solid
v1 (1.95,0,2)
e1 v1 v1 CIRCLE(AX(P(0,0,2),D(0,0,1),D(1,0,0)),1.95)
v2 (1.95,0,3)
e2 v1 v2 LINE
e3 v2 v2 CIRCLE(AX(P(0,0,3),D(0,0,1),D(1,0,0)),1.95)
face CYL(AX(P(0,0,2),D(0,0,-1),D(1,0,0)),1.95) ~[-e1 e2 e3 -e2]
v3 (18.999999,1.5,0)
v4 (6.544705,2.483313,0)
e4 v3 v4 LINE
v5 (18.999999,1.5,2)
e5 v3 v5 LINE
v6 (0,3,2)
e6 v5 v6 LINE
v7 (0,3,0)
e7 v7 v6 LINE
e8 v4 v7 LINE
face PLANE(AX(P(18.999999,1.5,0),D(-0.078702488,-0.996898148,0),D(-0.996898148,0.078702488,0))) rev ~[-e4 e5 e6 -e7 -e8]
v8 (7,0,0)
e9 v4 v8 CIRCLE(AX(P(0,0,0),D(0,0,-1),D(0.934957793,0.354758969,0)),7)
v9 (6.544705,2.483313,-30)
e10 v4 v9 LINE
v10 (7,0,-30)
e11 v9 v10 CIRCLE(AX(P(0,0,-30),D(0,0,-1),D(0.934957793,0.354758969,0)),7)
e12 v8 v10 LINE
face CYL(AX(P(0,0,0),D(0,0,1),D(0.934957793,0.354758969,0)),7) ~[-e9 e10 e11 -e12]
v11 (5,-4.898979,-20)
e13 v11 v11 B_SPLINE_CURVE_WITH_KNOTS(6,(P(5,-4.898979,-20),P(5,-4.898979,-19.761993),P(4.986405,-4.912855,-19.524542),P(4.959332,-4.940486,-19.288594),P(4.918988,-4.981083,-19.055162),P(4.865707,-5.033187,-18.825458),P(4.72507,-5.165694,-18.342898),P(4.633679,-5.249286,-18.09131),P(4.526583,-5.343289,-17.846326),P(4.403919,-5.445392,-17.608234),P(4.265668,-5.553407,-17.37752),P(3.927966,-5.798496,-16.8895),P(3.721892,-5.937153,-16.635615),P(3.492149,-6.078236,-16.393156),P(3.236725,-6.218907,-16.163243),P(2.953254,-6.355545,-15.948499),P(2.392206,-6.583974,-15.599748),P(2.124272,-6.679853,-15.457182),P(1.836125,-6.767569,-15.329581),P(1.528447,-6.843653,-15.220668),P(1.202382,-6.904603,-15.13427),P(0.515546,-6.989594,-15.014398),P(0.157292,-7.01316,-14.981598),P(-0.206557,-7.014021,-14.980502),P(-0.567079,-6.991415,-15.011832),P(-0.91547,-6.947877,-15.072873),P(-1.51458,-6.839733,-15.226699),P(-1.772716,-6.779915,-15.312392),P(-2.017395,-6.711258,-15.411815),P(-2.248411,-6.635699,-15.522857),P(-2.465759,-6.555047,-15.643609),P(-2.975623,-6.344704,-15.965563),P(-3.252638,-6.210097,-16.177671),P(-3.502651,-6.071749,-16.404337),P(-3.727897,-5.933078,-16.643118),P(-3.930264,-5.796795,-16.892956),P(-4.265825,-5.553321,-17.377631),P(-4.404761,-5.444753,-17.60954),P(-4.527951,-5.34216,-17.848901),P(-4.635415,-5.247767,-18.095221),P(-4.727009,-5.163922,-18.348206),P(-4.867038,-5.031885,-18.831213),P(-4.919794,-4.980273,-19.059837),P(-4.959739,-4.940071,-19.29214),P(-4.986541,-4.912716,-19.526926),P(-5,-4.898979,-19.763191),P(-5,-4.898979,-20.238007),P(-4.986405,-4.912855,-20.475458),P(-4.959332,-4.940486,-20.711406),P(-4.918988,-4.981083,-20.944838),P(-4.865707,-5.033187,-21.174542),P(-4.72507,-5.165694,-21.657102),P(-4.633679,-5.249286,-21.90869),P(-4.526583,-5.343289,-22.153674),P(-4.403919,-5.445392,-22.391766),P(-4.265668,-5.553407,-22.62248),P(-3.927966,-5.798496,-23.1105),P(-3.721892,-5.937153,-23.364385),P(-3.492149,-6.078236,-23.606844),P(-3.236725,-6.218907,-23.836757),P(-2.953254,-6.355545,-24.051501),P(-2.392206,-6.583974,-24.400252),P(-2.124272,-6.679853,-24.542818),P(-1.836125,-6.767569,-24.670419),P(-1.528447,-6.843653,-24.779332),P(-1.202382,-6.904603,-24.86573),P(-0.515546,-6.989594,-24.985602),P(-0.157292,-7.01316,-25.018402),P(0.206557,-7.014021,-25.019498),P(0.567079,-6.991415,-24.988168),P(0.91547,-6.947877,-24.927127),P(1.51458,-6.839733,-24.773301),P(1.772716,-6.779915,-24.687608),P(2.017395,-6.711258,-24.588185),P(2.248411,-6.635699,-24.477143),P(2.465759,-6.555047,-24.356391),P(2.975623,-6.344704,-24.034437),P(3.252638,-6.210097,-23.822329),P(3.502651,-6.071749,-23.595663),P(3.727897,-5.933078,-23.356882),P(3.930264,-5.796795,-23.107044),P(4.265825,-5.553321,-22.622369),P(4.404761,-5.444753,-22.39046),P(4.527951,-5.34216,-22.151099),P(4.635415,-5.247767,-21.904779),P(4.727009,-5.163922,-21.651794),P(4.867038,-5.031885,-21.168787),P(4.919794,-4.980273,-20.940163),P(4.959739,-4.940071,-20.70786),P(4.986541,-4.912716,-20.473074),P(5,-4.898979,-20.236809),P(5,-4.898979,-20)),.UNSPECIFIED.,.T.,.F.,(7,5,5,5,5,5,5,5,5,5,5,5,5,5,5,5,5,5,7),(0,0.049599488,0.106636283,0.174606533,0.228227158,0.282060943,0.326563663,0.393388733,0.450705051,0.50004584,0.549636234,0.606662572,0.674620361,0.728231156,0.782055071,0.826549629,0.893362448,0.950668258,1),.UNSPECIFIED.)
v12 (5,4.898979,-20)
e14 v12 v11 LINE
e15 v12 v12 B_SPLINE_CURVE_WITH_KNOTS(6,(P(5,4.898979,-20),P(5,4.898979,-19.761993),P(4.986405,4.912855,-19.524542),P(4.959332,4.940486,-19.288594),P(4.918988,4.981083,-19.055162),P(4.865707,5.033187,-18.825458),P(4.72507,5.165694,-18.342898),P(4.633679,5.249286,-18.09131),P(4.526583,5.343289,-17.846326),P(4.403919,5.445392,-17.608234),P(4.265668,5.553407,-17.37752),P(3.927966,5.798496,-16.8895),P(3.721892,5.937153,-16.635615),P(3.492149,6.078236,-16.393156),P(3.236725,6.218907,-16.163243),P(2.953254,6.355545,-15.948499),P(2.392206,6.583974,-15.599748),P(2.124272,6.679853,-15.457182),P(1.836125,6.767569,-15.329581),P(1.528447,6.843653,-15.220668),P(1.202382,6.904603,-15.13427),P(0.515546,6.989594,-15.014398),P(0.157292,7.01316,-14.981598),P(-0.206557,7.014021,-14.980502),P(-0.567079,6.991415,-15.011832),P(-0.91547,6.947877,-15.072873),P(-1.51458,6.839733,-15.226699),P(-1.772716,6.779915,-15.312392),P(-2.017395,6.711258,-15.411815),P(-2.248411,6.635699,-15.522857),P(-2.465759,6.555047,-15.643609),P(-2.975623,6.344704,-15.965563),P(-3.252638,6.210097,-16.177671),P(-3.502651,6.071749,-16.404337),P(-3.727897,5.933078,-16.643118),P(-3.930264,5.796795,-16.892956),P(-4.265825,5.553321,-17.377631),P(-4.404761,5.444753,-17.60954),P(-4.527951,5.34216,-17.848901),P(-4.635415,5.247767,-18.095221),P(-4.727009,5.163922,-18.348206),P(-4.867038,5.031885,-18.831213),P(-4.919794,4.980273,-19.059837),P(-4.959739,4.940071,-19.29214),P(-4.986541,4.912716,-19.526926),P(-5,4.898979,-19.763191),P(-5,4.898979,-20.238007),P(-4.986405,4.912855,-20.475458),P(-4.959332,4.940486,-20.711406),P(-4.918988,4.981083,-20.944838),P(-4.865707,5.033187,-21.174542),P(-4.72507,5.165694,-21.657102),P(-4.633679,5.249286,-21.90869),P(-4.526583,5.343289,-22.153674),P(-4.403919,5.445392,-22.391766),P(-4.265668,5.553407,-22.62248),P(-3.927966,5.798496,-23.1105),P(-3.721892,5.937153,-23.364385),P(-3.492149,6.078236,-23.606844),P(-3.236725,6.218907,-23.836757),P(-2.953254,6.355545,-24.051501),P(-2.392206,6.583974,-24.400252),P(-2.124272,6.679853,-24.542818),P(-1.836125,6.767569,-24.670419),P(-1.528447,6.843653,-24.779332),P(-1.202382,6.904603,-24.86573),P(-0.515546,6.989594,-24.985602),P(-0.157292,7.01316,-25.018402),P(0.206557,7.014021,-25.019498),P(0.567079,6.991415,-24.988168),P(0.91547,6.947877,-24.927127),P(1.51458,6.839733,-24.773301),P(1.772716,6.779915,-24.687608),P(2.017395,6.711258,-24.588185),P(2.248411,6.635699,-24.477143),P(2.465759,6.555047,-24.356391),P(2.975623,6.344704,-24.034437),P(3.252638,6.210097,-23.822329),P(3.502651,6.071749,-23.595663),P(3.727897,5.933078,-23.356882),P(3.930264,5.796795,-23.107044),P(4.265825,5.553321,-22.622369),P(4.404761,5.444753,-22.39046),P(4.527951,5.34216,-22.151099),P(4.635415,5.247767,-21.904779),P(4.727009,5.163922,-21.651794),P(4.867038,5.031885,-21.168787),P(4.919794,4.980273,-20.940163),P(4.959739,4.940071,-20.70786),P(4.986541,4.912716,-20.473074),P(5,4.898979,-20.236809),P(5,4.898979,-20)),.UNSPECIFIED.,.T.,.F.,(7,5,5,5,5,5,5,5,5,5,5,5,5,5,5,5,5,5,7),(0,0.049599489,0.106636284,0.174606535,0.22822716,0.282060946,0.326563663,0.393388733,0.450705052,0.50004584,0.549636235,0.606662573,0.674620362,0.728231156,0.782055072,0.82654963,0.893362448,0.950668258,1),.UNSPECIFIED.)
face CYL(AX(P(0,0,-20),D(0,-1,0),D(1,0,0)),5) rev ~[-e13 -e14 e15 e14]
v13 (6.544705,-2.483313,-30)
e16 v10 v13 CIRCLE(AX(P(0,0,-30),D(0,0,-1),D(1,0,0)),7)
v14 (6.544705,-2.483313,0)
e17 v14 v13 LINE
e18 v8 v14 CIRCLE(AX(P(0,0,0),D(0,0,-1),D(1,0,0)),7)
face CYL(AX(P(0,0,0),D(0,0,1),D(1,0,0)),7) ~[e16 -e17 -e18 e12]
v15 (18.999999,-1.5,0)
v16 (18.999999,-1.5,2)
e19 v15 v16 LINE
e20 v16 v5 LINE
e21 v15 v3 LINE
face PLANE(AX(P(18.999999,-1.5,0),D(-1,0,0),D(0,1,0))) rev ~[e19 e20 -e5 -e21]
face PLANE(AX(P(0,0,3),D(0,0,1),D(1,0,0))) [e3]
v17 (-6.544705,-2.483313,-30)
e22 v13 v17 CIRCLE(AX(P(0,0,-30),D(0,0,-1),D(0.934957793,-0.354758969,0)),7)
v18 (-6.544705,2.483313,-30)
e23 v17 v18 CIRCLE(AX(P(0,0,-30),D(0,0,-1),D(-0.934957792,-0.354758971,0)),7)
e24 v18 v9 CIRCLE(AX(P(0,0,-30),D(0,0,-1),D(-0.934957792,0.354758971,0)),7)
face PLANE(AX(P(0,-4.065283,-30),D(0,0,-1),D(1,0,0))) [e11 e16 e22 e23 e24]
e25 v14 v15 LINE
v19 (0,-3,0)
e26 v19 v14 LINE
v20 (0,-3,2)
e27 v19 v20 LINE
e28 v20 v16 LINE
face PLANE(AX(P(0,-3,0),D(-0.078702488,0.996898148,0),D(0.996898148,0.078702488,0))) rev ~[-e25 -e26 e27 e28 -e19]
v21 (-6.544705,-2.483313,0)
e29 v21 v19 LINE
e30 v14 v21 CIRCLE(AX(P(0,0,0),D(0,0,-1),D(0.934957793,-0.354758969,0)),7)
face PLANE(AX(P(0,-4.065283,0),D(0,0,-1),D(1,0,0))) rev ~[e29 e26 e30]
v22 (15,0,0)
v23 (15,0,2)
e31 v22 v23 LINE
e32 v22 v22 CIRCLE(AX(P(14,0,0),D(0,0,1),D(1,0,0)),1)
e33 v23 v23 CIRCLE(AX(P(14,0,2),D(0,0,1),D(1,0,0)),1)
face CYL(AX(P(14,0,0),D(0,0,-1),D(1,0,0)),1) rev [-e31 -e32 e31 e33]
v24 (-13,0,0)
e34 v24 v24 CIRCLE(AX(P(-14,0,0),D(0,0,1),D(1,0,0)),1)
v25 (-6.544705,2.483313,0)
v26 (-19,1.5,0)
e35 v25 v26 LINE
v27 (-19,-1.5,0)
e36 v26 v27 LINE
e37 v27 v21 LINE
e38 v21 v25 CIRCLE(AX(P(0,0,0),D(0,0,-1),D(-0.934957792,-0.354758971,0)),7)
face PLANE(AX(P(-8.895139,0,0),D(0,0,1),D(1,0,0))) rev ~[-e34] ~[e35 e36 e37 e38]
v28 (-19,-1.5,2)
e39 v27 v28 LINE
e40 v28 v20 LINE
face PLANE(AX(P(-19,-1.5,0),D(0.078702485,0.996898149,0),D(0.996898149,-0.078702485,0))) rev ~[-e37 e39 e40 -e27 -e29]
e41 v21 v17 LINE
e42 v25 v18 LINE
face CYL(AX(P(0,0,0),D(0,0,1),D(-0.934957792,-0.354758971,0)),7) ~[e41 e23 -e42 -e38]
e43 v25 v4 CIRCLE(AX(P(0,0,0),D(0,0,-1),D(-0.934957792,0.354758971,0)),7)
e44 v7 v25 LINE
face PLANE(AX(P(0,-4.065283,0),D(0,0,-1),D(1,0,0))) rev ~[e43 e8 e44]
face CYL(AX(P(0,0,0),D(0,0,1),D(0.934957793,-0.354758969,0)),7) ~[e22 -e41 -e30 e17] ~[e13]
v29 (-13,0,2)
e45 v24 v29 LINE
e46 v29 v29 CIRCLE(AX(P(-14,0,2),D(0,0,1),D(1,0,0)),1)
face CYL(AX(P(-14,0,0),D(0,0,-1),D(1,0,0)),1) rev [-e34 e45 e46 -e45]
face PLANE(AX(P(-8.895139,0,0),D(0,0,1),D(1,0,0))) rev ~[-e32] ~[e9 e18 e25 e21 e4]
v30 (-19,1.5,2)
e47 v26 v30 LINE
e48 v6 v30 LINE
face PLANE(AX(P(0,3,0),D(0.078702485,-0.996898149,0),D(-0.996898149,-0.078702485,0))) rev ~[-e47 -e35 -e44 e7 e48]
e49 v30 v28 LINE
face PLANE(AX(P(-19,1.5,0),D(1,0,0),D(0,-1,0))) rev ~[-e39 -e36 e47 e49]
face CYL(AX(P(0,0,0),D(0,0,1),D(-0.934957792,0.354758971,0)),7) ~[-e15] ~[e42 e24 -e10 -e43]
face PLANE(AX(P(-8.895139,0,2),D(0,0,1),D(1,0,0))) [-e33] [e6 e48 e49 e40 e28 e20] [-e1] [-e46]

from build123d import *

# Parameters (mm, degrees)
F0_R     = 1
F1_DEPTH = 2
F2_R     = 1.95
F3_DEPTH = 1
F5_DEPTH = 30
F6_R     = 5
F7_DEPTH = 12.5


# Not quite as in the source:
# - ends of sketch curves that miss each other by under 0.0002 mm in the source are joined


with BuildPart() as f1:
    # F0 (on Top) → F1 (new body)
    with BuildSketch(Plane.XY):
        Polygon((0, -3), (0, 0), (0, 3), (-19, 1.5), (-19, 0), (-19, -1.5), align=None)
        with Locations((-14, 0)):
            Circle(F0_R, mode=Mode.SUBTRACT)
        Polygon((0, 3), (0, 0), (0, -3), (18.9999993891, -1.5), (18.9999993891, 0), (18.9999993891, 1.5), align=None)
        with Locations((14, 0)):
            Circle(F0_R, mode=Mode.SUBTRACT)
    extrude(amount=F1_DEPTH)

    # F2 (on face) → F3 (join)
    with BuildSketch(Plane.XY.offset(2)):
        Circle(F2_R)
    extrude(amount=F3_DEPTH)

    # F4 (on face) → F5 (join)
    with BuildSketch(Plane(origin=(0, 0, 0), x_dir=(1, 0, 0), z_dir=(0, 0, -1))):
        with BuildLine():
            Line((0, 3), (6.5447045484, 2.4833127822))
            ThreePointArc((6.5447045484, 2.4833127822), (9.2e-09, 7), (-6.5447045419, 2.4833127993))
            Line((-6.5447045419, 2.4833127993), (0, 3))
        make_face()
        with BuildLine():
            ThreePointArc((6.5447045484, -2.4833127822), (6.8852353569, -1.2623525976), (7, 0))
            ThreePointArc((7, 0), (6.8852353569, 1.2623525976), (6.5447045484, 2.4833127822))
            Line((6.5447045484, 2.4833127822), (0, 3))
            Line((0, 3), (-6.5447045419, 2.4833127993))
            ThreePointArc((-6.5447045419, 2.4833127993), (-7, 0), (-6.5447045419, -2.4833127993))
            Line((-6.5447045419, -2.4833127993), (0, -3))
            Line((0, -3), (6.5447045484, -2.4833127822))
        make_face()
        with BuildLine():
            ThreePointArc((-6.5447045419, -2.4833127993), (9.2e-09, -7), (6.5447045484, -2.4833127822))
            Line((6.5447045484, -2.4833127822), (0, -3))
            Line((0, -3), (-6.5447045419, -2.4833127993))
        make_face()
    extrude(amount=F5_DEPTH)

    # F6 (on Front) → F7 (cut, symmetric)
    with BuildSketch(Plane.XZ):
        with Locations((0, -20)):
            Circle(F6_R)
    extrude(amount=F7_DEPTH, both=True, mode=Mode.SUBTRACT)


solid = f1.part
